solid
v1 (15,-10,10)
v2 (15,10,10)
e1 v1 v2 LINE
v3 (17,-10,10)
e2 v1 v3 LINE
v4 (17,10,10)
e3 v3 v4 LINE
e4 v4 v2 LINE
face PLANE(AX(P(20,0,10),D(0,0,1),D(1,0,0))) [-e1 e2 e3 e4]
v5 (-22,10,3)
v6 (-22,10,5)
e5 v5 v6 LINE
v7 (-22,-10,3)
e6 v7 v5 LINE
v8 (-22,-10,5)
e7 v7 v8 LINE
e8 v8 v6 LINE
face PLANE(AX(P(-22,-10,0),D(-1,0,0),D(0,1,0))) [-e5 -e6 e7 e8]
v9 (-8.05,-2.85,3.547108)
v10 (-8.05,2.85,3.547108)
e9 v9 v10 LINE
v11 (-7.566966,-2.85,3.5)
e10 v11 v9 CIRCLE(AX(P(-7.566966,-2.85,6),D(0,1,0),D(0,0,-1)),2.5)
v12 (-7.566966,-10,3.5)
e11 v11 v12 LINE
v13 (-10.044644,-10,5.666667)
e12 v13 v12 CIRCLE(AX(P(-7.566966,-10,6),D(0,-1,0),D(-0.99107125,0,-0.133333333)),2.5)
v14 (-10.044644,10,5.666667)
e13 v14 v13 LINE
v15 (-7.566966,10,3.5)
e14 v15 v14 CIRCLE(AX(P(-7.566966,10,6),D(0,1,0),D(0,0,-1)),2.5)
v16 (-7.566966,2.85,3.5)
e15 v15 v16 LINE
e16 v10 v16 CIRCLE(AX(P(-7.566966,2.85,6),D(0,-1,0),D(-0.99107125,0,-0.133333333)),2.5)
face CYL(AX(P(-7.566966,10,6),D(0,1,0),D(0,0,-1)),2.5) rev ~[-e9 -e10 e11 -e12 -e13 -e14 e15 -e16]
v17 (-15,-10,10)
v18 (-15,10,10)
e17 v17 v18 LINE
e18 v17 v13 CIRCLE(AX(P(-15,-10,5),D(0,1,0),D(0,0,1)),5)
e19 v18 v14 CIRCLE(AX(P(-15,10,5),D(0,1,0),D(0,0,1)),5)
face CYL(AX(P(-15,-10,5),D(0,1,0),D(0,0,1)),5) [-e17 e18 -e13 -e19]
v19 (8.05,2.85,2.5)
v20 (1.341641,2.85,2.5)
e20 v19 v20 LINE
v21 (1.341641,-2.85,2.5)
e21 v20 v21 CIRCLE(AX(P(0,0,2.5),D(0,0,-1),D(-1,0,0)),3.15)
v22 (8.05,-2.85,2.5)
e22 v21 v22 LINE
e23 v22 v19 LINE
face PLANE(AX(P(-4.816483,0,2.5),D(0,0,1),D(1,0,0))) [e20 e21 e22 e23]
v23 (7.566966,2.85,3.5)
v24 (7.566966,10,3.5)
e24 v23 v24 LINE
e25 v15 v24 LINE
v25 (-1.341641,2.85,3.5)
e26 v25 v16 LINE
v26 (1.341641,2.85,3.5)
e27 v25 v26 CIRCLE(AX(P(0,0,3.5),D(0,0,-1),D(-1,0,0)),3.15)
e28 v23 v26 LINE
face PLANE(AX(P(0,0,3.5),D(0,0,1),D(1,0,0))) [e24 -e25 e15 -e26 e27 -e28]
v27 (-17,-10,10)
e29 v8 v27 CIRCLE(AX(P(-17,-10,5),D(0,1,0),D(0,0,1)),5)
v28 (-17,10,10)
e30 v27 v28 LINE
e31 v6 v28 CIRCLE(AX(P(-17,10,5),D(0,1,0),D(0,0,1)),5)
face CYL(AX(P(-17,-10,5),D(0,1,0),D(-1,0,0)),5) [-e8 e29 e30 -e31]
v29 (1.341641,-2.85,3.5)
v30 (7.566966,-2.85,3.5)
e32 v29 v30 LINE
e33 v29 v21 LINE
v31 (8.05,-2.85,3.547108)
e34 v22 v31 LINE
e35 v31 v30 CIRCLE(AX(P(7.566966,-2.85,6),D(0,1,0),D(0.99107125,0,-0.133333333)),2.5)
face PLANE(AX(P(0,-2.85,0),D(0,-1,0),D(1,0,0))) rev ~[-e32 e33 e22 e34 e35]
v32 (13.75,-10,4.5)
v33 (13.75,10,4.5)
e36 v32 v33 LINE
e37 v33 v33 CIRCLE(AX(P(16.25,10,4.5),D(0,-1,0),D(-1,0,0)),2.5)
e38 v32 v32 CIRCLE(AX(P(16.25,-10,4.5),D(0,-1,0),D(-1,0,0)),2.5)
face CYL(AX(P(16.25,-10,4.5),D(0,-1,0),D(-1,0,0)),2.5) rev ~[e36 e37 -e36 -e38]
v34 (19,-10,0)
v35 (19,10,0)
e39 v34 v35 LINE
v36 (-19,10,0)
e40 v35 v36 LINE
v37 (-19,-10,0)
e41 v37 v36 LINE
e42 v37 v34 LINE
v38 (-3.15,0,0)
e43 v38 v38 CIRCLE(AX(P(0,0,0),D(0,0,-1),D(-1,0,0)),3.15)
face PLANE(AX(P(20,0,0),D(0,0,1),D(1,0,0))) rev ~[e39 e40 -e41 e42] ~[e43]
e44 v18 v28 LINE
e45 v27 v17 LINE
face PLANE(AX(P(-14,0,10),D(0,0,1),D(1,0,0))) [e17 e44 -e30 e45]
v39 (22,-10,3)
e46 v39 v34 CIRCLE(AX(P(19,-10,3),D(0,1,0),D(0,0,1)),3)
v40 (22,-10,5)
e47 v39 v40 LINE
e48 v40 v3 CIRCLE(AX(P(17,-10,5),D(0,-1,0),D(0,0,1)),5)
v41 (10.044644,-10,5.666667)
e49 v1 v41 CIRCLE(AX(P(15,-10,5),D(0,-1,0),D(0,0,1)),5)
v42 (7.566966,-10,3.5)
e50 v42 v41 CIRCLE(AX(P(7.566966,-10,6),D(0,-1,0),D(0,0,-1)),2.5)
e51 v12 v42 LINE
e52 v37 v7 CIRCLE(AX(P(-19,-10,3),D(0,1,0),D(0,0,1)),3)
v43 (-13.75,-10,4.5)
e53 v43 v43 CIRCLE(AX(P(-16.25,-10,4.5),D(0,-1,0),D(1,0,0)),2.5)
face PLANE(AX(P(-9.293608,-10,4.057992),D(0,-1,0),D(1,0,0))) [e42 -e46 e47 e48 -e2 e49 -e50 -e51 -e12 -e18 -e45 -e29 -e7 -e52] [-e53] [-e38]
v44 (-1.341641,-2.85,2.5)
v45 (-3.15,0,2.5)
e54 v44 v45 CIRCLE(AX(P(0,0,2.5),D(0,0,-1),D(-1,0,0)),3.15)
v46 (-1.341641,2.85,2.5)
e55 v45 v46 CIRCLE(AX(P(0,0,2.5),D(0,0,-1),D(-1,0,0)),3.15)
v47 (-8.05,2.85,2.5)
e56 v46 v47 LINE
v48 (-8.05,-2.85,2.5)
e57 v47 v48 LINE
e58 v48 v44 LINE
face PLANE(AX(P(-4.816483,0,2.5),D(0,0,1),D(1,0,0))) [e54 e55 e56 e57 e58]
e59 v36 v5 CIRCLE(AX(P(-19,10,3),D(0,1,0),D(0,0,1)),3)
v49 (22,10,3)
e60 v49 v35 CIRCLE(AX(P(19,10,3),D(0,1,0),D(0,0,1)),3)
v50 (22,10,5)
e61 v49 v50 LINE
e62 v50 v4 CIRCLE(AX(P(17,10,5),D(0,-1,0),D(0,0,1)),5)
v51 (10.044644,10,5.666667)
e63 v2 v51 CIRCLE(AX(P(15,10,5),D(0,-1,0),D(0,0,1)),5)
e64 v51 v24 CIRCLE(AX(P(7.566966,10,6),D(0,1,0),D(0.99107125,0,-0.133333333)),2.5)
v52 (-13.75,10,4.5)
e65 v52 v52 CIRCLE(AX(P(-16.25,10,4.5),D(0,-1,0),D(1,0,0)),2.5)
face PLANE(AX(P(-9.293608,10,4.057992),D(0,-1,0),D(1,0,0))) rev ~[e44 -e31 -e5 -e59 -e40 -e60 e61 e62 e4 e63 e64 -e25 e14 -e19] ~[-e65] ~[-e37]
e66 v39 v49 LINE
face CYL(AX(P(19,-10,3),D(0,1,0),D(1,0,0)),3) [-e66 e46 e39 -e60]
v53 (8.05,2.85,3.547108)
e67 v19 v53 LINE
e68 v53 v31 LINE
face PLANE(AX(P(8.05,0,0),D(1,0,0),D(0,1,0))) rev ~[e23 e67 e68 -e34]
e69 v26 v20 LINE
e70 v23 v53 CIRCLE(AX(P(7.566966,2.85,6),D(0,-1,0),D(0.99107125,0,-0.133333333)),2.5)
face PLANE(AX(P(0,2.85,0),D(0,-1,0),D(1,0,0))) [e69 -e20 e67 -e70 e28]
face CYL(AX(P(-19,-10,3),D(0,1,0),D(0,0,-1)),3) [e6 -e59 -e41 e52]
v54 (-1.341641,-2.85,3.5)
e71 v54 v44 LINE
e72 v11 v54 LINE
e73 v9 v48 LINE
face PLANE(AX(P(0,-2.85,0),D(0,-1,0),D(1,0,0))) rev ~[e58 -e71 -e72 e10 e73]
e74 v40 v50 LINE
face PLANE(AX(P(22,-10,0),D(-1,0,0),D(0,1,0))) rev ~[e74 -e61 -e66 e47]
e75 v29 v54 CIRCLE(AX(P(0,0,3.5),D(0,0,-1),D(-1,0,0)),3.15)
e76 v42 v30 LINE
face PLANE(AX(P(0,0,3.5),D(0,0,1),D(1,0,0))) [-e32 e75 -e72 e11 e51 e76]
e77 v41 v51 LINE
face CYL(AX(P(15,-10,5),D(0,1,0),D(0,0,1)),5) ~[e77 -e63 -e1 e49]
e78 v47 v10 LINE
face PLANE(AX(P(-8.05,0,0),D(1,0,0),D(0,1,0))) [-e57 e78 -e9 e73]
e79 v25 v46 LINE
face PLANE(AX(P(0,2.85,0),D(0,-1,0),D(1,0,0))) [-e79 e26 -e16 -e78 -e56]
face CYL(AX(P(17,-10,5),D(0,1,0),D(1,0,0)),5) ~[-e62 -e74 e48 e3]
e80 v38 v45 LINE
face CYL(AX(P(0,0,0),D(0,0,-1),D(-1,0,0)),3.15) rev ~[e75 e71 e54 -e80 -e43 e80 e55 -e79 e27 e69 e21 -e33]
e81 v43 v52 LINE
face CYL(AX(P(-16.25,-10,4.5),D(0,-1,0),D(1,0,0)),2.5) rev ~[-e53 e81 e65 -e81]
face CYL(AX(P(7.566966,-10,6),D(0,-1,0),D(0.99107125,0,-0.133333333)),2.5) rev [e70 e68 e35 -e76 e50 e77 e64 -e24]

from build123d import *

# Parameters (mm, degrees)
F0_W          = 36
F0_H          = 20
F1_DEPTH      = 3.5
F3_DEPTH      = 1
F4_W          = 4
F4_H          = 20
F4_W_2        = 8
F5_DEPTH      = 10
F6_R          = 2.5
F7_DEPTH      = 20.001
F8_R          = 5
F9_R          = 3
F10_T4_DEPTH  = 20
F10_T10_DEPTH = 20
F10_T16_DEPTH = 20
F10_T23_DEPTH = 20
F10_T29_DEPTH = 20
F10_T35_DEPTH = 20
F10_T41_DEPTH = 20
F10_T47_DEPTH = 20
F10_T54_DEPTH = 20
F10_T60_DEPTH = 20


# Not quite as in the source:
# - a fillet or chamfer that OpenCascade refuses, or shapes differently, is made with other operations: its cross-section is extruded or revolved along the edge and cut away or added


with BuildPart() as f1:
    # F0 (on Top) → F1 (new body)
    with BuildSketch(Plane.XY):
        Rectangle(F0_W, F0_H)
        with BuildLine():
            ThreePointArc((3.15, 0), (0, -3.15), (-3.15, 0))
            ThreePointArc((-3.15, 0), (0, 3.15), (3.15, 0))
        make_face(mode=Mode.SUBTRACT)
    extrude(amount=F1_DEPTH)

    # F2 (on face) → F3 (cut)
    with BuildSketch(Plane.XY.offset(3.5)):
        with BuildLine():
            Line((-1.3416407865, 2.85), (-8.05, 2.85))
            Line((-8.05, 2.85), (-8.05, -2.85))
            Line((-8.05, -2.85), (-1.3416407865, -2.85))
            ThreePointArc((-1.3416407865, -2.85), (-3.15, 0), (-1.3416407865, 2.85))
        make_face()
        with BuildLine():
            Line((1.3416407865, 2.85), (-1.3416407865, 2.85))
            ThreePointArc((-1.3416407865, 2.85), (-3.15, 0), (-1.3416407865, -2.85))
            Line((-1.3416407865, -2.85), (1.3416407865, -2.85))
            ThreePointArc((1.3416407865, -2.85), (2.6597620643, -1.6876509595), (3.15, 0))
            ThreePointArc((3.15, 0), (2.6597620643, 1.6876509595), (1.3416407865, 2.85))
        make_face()
        with BuildLine():
            Line((8.05, 2.85), (1.3416407865, 2.85))
            ThreePointArc((1.3416407865, 2.85), (2.6597620643, 1.6876509595), (3.15, 0))
            ThreePointArc((3.15, 0), (2.6597620643, -1.6876509595), (1.3416407865, -2.85))
            Line((1.3416407865, -2.85), (8.05, -2.85))
            Line((8.05, -2.85), (8.05, 2.85))
        make_face()
    extrude(amount=-F3_DEPTH, mode=Mode.SUBTRACT)

    # F4 (on Top) → F5 (join)
    with BuildSketch(Plane.XY):
        with Locations((20, 0)):
            Rectangle(F4_W, F4_H)
        with Locations((14, 0)):
            Rectangle(F4_W_2, F4_H)
        with Locations((-14, 0)):
            Rectangle(F4_W_2, F4_H)
        with Locations((-20, 0)):
            Rectangle(F4_W, F4_H)
    extrude(amount=F5_DEPTH)

    # F6 (on face) → F7 (cut, through all)
    with BuildSketch(Plane.XZ.offset(10)):
        with Locations((-16.25, 4.5)):
            Circle(F6_R)
        with BuildLine():
            ThreePointArc((18.75, 4.5), (16.25, 7), (13.75, 4.5))
            ThreePointArc((13.75, 4.5), (16.25, 2), (18.75, 4.5))
        make_face()
    extrude(amount=-F7_DEPTH, mode=Mode.SUBTRACT)

    # F8
    f8_edges = [f1.edges().sort_by_distance(p)[0] for p in [
        (-22, 0, 10),
        (-10, 0, 10),
        (10, 0, 10),
        (22, 0, 10),
    ]]
    fillet(f8_edges, radius=F8_R)

    # F9
    f9_edges = [f1.edges().sort_by_distance(p)[0] for p in [
        (-22, 0, 0),
        (22, 0, 0),
    ]]
    fillet(f9_edges, radius=F9_R)

    # F10: fillet of radius 2.5 on 2 edges, made by hand


with BuildPart() as f10_tool2:
    # F10_s3 → F10_t4 (new body)
    with BuildSketch(Plane.XZ.offset(10)):
        with BuildLine():
            ThreePointArc((10.0446437509, 5.6666666667), (9.2126670979, 4.1180683682), (7.5669656263, 3.5))
            Line((7.5669656263, 3.5), (7.5669656263, 3.25))
            Line((7.5669656263, 3.25), (10, 3.25))
            Line((10, 3.25), (10.25, 3.5))
            ThreePointArc((10.25, 3.5), (10.25, 5), (10.2924115633, 5.6333333333))
            Line((10.2924115633, 5.6333333333), (10.0446437509, 5.6666666667))
        make_face()
    extrude(amount=-F10_T4_DEPTH)

    split(bisect_by=Plane.YZ.offset(8.05), keep=Keep.TOP)

    split(bisect_by=Plane.XZ.offset(2.85), keep=Keep.TOP)


with BuildPart() as f1_1:
    add(f1.part)

    # F10_t1: union F10_tool2
    add(f10_tool2.part)


with BuildPart() as f10_tool8:
    # F10_s9 → F10_t10 (new body)
    with BuildSketch(Plane.XZ.offset(10)):
        with BuildLine():
            ThreePointArc((10.0446437509, 5.6666666667), (9.2126670979, 4.1180683682), (7.5669656263, 3.5))
            Line((7.5669656263, 3.5), (7.5669656263, 3.25))
            Line((7.5669656263, 3.25), (10, 3.25))
            Line((10, 3.25), (10.25, 3.5))
            ThreePointArc((10.25, 3.5), (10.25, 5), (10.2924115633, 5.6333333333))
            Line((10.2924115633, 5.6333333333), (10.0446437509, 5.6666666667))
        make_face()
    extrude(amount=-F10_T10_DEPTH)

    split(bisect_by=Plane.YZ.offset(8.05), keep=Keep.BOTTOM)

    split(bisect_by=Plane.XZ.offset(2.85), keep=Keep.TOP)


with BuildPart() as f1_2:
    add(f1_1.part)

    # F10_t7: union F10_tool8
    add(f10_tool8.part)


with BuildPart() as f10_tool14:
    # F10_s15 → F10_t16 (new body)
    with BuildSketch(Plane.XZ.offset(10)):
        with BuildLine():
            ThreePointArc((10.0446437509, 5.6666666667), (9.2126670979, 4.1180683682), (7.5669656263, 3.5))
            Line((7.5669656263, 3.5), (7.5669656263, 3.25))
            Line((7.5669656263, 3.25), (10, 3.25))
            Line((10, 3.25), (10.25, 3.5))
            ThreePointArc((10.25, 3.5), (10.25, 5), (10.2924115633, 5.6333333333))
            Line((10.2924115633, 5.6333333333), (10.0446437509, 5.6666666667))
        make_face()
    extrude(amount=-F10_T16_DEPTH)

    split(bisect_by=Plane.XZ.offset(-2.85), keep=Keep.TOP)

    split(bisect_by=Plane.YZ.offset(8.05), keep=Keep.TOP)

    split(bisect_by=Plane.XZ.offset(2.85), keep=Keep.BOTTOM)


with BuildPart() as f1_3:
    add(f1_2.part)

    # F10_t13: union F10_tool14
    add(f10_tool14.part)


with BuildPart() as f10_tool21:
    # F10_s22 → F10_t23 (new body)
    with BuildSketch(Plane.XZ.offset(10)):
        with BuildLine():
            ThreePointArc((10.0446437509, 5.6666666667), (9.2126670979, 4.1180683682), (7.5669656263, 3.5))
            Line((7.5669656263, 3.5), (7.5669656263, 3.25))
            Line((7.5669656263, 3.25), (10, 3.25))
            Line((10, 3.25), (10.25, 3.5))
            ThreePointArc((10.25, 3.5), (10.25, 5), (10.2924115633, 5.6333333333))
            Line((10.2924115633, 5.6333333333), (10.0446437509, 5.6666666667))
        make_face()
    extrude(amount=-F10_T23_DEPTH)

    split(bisect_by=Plane.XZ.offset(-2.85), keep=Keep.BOTTOM)

    split(bisect_by=Plane.YZ.offset(8.05), keep=Keep.TOP)


with BuildPart() as f1_4:
    add(f1_3.part)

    # F10_t20: union F10_tool21
    add(f10_tool21.part)


with BuildPart() as f10_tool27:
    # F10_s28 → F10_t29 (new body)
    with BuildSketch(Plane.XZ.offset(10)):
        with BuildLine():
            ThreePointArc((10.0446437509, 5.6666666667), (9.2126670979, 4.1180683682), (7.5669656263, 3.5))
            Line((7.5669656263, 3.5), (7.5669656263, 3.25))
            Line((7.5669656263, 3.25), (10, 3.25))
            Line((10, 3.25), (10.25, 3.5))
            ThreePointArc((10.25, 3.5), (10.25, 5), (10.2924115633, 5.6333333333))
            Line((10.2924115633, 5.6333333333), (10.0446437509, 5.6666666667))
        make_face()
    extrude(amount=-F10_T29_DEPTH)

    split(bisect_by=Plane.XZ.offset(-2.85), keep=Keep.BOTTOM)

    split(bisect_by=Plane.YZ.offset(8.05), keep=Keep.BOTTOM)


with BuildPart() as f1_5:
    add(f1_4.part)

    # F10_t26: union F10_tool27
    add(f10_tool27.part)


with BuildPart() as f10_tool33:
    # F10_s34 → F10_t35 (new body)
    with BuildSketch(Plane.XZ.offset(-10)):
        with BuildLine():
            ThreePointArc((-7.5669656263, 3.5), (-9.2126670979, 4.1180683682), (-10.0446437509, 5.6666666667))
            Line((-10.0446437509, 5.6666666667), (-10.2924115633, 5.6333333333))
            ThreePointArc((-10.2924115633, 5.6333333333), (-10.25, 5), (-10.25, 3.5))
            Line((-10.25, 3.5), (-10, 3.25))
            Line((-10, 3.25), (-7.5669656263, 3.25))
            Line((-7.5669656263, 3.25), (-7.5669656263, 3.5))
        make_face()
    extrude(amount=F10_T35_DEPTH)

    split(bisect_by=Plane.XZ.offset(-2.85), keep=Keep.BOTTOM)

    split(bisect_by=Plane.YZ.offset(-8.05), keep=Keep.TOP)


with BuildPart() as f1_6:
    add(f1_5.part)

    # F10_t32: union F10_tool33
    add(f10_tool33.part)


with BuildPart() as f10_tool39:
    # F10_s40 → F10_t41 (new body)
    with BuildSketch(Plane.XZ.offset(-10)):
        with BuildLine():
            ThreePointArc((-7.5669656263, 3.5), (-9.2126670979, 4.1180683682), (-10.0446437509, 5.6666666667))
            Line((-10.0446437509, 5.6666666667), (-10.2924115633, 5.6333333333))
            ThreePointArc((-10.2924115633, 5.6333333333), (-10.25, 5), (-10.25, 3.5))
            Line((-10.25, 3.5), (-10, 3.25))
            Line((-10, 3.25), (-7.5669656263, 3.25))
            Line((-7.5669656263, 3.25), (-7.5669656263, 3.5))
        make_face()
    extrude(amount=F10_T41_DEPTH)

    split(bisect_by=Plane.XZ.offset(-2.85), keep=Keep.BOTTOM)

    split(bisect_by=Plane.YZ.offset(-8.05), keep=Keep.BOTTOM)


with BuildPart() as f1_7:
    add(f1_6.part)

    # F10_t38: union F10_tool39
    add(f10_tool39.part)


with BuildPart() as f10_tool45:
    # F10_s46 → F10_t47 (new body)
    with BuildSketch(Plane.XZ.offset(-10)):
        with BuildLine():
            ThreePointArc((-7.5669656263, 3.5), (-9.2126670979, 4.1180683682), (-10.0446437509, 5.6666666667))
            Line((-10.0446437509, 5.6666666667), (-10.2924115633, 5.6333333333))
            ThreePointArc((-10.2924115633, 5.6333333333), (-10.25, 5), (-10.25, 3.5))
            Line((-10.25, 3.5), (-10, 3.25))
            Line((-10, 3.25), (-7.5669656263, 3.25))
            Line((-7.5669656263, 3.25), (-7.5669656263, 3.5))
        make_face()
    extrude(amount=F10_T47_DEPTH)

    split(bisect_by=Plane.XZ.offset(-2.85), keep=Keep.TOP)

    split(bisect_by=Plane.YZ.offset(-8.05), keep=Keep.BOTTOM)

    split(bisect_by=Plane.XZ.offset(2.85), keep=Keep.BOTTOM)


with BuildPart() as f1_8:
    add(f1_7.part)

    # F10_t44: union F10_tool45
    add(f10_tool45.part)


with BuildPart() as f10_tool52:
    # F10_s53 → F10_t54 (new body)
    with BuildSketch(Plane.XZ.offset(-10)):
        with BuildLine():
            ThreePointArc((-7.5669656263, 3.5), (-9.2126670979, 4.1180683682), (-10.0446437509, 5.6666666667))
            Line((-10.0446437509, 5.6666666667), (-10.2924115633, 5.6333333333))
            ThreePointArc((-10.2924115633, 5.6333333333), (-10.25, 5), (-10.25, 3.5))
            Line((-10.25, 3.5), (-10, 3.25))
            Line((-10, 3.25), (-7.5669656263, 3.25))
            Line((-7.5669656263, 3.25), (-7.5669656263, 3.5))
        make_face()
    extrude(amount=F10_T54_DEPTH)

    split(bisect_by=Plane.YZ.offset(-8.05), keep=Keep.TOP)

    split(bisect_by=Plane.XZ.offset(2.85), keep=Keep.TOP)


with BuildPart() as f1_9:
    add(f1_8.part)

    # F10_t51: union F10_tool52
    add(f10_tool52.part)


with BuildPart() as f10_tool58:
    # F10_s59 → F10_t60 (new body)
    with BuildSketch(Plane.XZ.offset(-10)):
        with BuildLine():
            ThreePointArc((-7.5669656263, 3.5), (-9.2126670979, 4.1180683682), (-10.0446437509, 5.6666666667))
            Line((-10.0446437509, 5.6666666667), (-10.2924115633, 5.6333333333))
            ThreePointArc((-10.2924115633, 5.6333333333), (-10.25, 5), (-10.25, 3.5))
            Line((-10.25, 3.5), (-10, 3.25))
            Line((-10, 3.25), (-7.5669656263, 3.25))
            Line((-7.5669656263, 3.25), (-7.5669656263, 3.5))
        make_face()
    extrude(amount=F10_T60_DEPTH)

    split(bisect_by=Plane.YZ.offset(-8.05), keep=Keep.BOTTOM)

    split(bisect_by=Plane.XZ.offset(2.85), keep=Keep.TOP)


with BuildPart() as f1_10:
    add(f1_9.part)

    # F10_t57: union F10_tool58
    add(f10_tool58.part)


solid = f1_10.part
